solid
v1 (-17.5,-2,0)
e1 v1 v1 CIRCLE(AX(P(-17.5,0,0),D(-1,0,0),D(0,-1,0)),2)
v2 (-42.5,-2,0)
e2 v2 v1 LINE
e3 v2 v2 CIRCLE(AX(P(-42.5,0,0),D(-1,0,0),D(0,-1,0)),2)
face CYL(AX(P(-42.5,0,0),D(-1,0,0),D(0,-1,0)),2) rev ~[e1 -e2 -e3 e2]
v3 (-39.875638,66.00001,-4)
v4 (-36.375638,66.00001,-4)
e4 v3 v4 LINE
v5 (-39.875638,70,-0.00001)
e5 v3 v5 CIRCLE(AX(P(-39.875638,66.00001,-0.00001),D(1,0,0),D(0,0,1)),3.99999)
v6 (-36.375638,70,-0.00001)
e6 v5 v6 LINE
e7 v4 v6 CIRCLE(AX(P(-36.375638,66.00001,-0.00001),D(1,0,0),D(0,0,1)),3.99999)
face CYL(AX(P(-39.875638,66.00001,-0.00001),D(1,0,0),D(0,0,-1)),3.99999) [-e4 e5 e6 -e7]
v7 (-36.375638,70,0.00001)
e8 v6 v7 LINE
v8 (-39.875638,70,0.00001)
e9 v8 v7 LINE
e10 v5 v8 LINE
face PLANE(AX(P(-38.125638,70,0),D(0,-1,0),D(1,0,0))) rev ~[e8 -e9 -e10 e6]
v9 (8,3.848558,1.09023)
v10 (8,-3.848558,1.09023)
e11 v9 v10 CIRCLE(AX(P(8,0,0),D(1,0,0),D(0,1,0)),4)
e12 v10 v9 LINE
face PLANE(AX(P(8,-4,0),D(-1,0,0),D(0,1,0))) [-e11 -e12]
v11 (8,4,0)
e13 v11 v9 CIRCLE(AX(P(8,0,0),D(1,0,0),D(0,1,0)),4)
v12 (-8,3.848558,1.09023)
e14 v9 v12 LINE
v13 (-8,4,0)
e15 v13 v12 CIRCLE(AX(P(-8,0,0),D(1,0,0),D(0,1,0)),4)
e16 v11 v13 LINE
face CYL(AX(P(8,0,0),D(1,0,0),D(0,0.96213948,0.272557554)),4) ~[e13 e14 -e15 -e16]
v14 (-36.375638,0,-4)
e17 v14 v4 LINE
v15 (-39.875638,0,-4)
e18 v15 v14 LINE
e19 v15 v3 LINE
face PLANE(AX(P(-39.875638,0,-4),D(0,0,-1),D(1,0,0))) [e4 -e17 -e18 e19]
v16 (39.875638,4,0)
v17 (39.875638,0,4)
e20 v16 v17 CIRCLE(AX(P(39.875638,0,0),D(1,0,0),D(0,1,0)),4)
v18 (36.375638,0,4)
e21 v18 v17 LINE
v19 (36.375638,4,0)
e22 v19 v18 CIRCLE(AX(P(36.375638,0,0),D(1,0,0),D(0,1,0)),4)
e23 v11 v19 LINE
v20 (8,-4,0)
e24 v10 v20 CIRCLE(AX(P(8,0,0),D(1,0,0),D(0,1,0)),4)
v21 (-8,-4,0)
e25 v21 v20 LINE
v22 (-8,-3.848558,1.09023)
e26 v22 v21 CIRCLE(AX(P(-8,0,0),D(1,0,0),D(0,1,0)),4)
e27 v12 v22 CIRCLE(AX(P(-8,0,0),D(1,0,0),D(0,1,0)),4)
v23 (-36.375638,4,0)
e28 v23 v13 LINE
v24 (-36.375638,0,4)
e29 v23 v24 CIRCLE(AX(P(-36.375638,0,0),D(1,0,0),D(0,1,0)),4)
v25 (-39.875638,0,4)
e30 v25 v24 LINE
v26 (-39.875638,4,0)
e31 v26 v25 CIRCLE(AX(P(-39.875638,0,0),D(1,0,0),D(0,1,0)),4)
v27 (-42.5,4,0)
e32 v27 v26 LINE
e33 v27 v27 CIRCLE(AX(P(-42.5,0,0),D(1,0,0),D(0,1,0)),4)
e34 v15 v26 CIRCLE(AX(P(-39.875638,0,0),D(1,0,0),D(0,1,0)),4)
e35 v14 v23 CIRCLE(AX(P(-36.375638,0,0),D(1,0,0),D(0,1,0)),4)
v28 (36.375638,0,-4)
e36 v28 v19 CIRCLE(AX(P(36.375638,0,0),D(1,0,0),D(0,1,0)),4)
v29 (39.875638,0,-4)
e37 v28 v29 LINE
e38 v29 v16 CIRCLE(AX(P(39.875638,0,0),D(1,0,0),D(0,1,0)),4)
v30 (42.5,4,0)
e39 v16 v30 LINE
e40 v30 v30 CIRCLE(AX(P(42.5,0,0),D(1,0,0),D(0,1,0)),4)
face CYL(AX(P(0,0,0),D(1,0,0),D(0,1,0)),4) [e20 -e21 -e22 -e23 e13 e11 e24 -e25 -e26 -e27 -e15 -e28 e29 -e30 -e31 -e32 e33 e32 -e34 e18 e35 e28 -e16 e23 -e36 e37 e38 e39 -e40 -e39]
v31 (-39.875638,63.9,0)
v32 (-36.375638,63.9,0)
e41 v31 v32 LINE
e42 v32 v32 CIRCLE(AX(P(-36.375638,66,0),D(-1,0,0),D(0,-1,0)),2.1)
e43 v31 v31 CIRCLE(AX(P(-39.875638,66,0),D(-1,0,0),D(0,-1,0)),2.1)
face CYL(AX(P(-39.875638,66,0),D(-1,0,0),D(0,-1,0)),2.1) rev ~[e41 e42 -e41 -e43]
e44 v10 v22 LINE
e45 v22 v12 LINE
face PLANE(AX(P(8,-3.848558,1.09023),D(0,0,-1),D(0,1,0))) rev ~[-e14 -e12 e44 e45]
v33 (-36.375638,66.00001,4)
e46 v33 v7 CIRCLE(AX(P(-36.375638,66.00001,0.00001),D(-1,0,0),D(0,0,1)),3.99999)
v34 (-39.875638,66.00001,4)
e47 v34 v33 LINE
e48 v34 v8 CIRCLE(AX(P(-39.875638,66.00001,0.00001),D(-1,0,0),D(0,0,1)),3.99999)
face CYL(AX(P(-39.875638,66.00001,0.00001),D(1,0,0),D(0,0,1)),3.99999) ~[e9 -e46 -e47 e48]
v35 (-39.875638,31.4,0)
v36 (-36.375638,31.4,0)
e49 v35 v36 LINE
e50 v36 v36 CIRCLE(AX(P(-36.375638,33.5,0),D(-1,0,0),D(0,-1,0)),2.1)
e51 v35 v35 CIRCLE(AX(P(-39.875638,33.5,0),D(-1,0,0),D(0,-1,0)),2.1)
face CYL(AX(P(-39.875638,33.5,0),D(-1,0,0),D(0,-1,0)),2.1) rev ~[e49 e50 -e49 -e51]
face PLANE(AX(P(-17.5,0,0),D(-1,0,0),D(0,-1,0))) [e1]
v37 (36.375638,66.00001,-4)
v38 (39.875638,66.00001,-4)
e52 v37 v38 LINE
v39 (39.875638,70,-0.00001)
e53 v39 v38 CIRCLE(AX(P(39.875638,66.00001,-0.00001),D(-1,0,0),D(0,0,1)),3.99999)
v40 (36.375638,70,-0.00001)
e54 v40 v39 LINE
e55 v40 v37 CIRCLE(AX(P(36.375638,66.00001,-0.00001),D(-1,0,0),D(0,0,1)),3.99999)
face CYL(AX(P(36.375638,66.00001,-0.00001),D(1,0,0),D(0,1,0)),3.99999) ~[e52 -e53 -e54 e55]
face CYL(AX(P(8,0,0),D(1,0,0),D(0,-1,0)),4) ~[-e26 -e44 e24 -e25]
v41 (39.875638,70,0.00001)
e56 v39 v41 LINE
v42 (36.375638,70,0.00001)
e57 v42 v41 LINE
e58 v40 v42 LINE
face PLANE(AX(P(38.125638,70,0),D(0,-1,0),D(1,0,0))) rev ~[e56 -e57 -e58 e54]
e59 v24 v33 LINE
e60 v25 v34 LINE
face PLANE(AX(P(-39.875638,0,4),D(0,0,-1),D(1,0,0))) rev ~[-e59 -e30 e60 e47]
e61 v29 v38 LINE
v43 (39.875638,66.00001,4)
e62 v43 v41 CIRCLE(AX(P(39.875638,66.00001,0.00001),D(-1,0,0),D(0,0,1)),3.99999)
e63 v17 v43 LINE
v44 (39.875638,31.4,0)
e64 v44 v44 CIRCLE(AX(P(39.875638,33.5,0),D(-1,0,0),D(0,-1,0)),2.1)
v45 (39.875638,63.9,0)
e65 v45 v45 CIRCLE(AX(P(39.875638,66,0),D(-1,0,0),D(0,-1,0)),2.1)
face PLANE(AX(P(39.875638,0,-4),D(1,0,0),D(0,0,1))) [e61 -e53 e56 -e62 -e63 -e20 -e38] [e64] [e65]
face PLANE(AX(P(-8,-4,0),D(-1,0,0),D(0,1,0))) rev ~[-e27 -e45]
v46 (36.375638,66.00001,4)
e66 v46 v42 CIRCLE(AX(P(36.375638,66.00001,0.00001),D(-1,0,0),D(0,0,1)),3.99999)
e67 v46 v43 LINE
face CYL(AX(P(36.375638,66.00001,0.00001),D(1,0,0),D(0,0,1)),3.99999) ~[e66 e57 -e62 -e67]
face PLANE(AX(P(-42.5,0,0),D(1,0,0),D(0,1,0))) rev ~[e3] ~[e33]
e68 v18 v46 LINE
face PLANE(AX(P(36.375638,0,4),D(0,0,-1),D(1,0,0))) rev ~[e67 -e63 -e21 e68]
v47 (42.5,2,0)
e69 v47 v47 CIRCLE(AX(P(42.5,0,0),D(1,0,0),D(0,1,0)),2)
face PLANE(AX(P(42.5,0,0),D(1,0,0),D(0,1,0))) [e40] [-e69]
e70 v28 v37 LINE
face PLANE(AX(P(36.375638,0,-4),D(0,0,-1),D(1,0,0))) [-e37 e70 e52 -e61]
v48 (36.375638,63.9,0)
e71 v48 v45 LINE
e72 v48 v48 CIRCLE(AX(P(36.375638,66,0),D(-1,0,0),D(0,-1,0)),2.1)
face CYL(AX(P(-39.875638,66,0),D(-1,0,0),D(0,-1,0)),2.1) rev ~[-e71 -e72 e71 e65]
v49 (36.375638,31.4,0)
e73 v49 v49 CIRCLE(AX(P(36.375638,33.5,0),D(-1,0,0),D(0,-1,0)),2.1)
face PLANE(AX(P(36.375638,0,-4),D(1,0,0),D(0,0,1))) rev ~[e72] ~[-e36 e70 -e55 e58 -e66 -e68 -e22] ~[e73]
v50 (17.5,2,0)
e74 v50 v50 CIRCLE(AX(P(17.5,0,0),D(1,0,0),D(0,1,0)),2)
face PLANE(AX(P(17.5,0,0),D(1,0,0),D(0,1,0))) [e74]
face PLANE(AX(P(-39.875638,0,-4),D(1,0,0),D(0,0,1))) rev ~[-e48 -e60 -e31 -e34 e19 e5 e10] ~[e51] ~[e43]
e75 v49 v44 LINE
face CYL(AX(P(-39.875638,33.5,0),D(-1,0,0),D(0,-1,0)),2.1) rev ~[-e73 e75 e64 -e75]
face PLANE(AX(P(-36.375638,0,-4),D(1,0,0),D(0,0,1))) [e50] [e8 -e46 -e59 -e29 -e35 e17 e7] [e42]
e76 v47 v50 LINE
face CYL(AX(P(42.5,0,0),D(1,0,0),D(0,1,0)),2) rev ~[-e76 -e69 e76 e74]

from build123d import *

# Parameters (mm, degrees)
F0_R          = 4
F1_DEPTH      = 42.5
F1_DEPTH_BACK = 42.5
F2_W          = 8
F2_H          = 8
F3_DEPTH      = 25
F4_W          = 3.5
F4_H          = 8
F5_DEPTH      = 70
F6_R          = 2
F7_DEPTH      = 25
F8_R          = 2
F9_DEPTH      = 25
F10_R         = 3.99999
F11_R         = 2.1
F12_DEPTH     = 82.3766380975
F14_DEPTH     = 16


# Not quite as in the source:
# - a fillet or chamfer is up to 0.001 mm smaller than in the source, because OpenCascade refuses the exact size


with BuildPart() as f1:
    # F0 (on Right) → F1 (new body, two sides)
    with BuildSketch(Plane.YZ) as f1_sk:
        Circle(F0_R)
    extrude(amount=F1_DEPTH)
    extrude(f1_sk.sketch, amount=-F1_DEPTH_BACK)

    # F2 (on Top) → F3 (cut)
    with BuildSketch(Plane.XY):
        with Locations((-4, 0)):
            Rectangle(F2_W, F2_H)
        with Locations((4, 0)):
            Rectangle(F2_W, F2_H)
    extrude(amount=F3_DEPTH, mode=Mode.SUBTRACT)

    # F4 (on Front) → F5 (join)
    with BuildSketch(Plane.XZ):
        with Locations((38.1256380975, 0)):
            Rectangle(F4_W, F4_H)
        with Locations((-38.1256380975, 0)):
            Rectangle(F4_W, F4_H)
    extrude(amount=-F5_DEPTH)

    # F6 (on face) → F7 (cut)
    with BuildSketch(Plane.YZ.offset(42.5)):
        Circle(F6_R)
    extrude(amount=-F7_DEPTH, mode=Mode.SUBTRACT)

    # F8 (on face) → F9 (cut)
    with BuildSketch(Plane(origin=(-42.5, 0, 0), x_dir=(0, -1, 0), z_dir=(-1, 0, 0))):
        Circle(F8_R)
    extrude(amount=-F9_DEPTH, mode=Mode.SUBTRACT)

    # F10 (radius 4 in the source; OpenCascade refuses exactly that, so slightly less here)
    f10_edges = [f1.edges().sort_by_distance(p)[0] for p in [
        (38.125638, 70, 4),
        (38.125638, 70, -4),
        (-38.125638, 70, 4),
        (-38.125638, 70, -4),
    ]]
    fillet(f10_edges, radius=F10_R)

    # F11 (on face) → F12 (cut, through all)
    with BuildSketch(Plane(origin=(-39.8756380975, 0, 0), x_dir=(0, -1, 0), z_dir=(-1, 0, 0))):
        with Locations((-66, 0)):
            Circle(F11_R)
        with Locations((-33.5, 0)):
            Circle(F11_R)
    extrude(amount=-F12_DEPTH, mode=Mode.SUBTRACT)

    # F13 (on face) → F14 (join, through all)
    with BuildSketch(Plane(origin=(8, 0, 0), x_dir=(0, -1, 0), z_dir=(-1, 0, 0))):
        with BuildLine():
            ThreePointArc((-3.848557921, 1.0902302184), (-3.9619585866, 0.5503491238), (-4, 0))
            Line((-4, 0), (4, 0))
            ThreePointArc((4, 0), (3.9619585866, 0.5503491238), (3.848557921, 1.0902302184))
            Line((3.848557921, 1.0902302184), (-3.848557921, 1.0902302184))
        make_face()
    extrude(amount=F14_DEPTH)


solid = f1.part
